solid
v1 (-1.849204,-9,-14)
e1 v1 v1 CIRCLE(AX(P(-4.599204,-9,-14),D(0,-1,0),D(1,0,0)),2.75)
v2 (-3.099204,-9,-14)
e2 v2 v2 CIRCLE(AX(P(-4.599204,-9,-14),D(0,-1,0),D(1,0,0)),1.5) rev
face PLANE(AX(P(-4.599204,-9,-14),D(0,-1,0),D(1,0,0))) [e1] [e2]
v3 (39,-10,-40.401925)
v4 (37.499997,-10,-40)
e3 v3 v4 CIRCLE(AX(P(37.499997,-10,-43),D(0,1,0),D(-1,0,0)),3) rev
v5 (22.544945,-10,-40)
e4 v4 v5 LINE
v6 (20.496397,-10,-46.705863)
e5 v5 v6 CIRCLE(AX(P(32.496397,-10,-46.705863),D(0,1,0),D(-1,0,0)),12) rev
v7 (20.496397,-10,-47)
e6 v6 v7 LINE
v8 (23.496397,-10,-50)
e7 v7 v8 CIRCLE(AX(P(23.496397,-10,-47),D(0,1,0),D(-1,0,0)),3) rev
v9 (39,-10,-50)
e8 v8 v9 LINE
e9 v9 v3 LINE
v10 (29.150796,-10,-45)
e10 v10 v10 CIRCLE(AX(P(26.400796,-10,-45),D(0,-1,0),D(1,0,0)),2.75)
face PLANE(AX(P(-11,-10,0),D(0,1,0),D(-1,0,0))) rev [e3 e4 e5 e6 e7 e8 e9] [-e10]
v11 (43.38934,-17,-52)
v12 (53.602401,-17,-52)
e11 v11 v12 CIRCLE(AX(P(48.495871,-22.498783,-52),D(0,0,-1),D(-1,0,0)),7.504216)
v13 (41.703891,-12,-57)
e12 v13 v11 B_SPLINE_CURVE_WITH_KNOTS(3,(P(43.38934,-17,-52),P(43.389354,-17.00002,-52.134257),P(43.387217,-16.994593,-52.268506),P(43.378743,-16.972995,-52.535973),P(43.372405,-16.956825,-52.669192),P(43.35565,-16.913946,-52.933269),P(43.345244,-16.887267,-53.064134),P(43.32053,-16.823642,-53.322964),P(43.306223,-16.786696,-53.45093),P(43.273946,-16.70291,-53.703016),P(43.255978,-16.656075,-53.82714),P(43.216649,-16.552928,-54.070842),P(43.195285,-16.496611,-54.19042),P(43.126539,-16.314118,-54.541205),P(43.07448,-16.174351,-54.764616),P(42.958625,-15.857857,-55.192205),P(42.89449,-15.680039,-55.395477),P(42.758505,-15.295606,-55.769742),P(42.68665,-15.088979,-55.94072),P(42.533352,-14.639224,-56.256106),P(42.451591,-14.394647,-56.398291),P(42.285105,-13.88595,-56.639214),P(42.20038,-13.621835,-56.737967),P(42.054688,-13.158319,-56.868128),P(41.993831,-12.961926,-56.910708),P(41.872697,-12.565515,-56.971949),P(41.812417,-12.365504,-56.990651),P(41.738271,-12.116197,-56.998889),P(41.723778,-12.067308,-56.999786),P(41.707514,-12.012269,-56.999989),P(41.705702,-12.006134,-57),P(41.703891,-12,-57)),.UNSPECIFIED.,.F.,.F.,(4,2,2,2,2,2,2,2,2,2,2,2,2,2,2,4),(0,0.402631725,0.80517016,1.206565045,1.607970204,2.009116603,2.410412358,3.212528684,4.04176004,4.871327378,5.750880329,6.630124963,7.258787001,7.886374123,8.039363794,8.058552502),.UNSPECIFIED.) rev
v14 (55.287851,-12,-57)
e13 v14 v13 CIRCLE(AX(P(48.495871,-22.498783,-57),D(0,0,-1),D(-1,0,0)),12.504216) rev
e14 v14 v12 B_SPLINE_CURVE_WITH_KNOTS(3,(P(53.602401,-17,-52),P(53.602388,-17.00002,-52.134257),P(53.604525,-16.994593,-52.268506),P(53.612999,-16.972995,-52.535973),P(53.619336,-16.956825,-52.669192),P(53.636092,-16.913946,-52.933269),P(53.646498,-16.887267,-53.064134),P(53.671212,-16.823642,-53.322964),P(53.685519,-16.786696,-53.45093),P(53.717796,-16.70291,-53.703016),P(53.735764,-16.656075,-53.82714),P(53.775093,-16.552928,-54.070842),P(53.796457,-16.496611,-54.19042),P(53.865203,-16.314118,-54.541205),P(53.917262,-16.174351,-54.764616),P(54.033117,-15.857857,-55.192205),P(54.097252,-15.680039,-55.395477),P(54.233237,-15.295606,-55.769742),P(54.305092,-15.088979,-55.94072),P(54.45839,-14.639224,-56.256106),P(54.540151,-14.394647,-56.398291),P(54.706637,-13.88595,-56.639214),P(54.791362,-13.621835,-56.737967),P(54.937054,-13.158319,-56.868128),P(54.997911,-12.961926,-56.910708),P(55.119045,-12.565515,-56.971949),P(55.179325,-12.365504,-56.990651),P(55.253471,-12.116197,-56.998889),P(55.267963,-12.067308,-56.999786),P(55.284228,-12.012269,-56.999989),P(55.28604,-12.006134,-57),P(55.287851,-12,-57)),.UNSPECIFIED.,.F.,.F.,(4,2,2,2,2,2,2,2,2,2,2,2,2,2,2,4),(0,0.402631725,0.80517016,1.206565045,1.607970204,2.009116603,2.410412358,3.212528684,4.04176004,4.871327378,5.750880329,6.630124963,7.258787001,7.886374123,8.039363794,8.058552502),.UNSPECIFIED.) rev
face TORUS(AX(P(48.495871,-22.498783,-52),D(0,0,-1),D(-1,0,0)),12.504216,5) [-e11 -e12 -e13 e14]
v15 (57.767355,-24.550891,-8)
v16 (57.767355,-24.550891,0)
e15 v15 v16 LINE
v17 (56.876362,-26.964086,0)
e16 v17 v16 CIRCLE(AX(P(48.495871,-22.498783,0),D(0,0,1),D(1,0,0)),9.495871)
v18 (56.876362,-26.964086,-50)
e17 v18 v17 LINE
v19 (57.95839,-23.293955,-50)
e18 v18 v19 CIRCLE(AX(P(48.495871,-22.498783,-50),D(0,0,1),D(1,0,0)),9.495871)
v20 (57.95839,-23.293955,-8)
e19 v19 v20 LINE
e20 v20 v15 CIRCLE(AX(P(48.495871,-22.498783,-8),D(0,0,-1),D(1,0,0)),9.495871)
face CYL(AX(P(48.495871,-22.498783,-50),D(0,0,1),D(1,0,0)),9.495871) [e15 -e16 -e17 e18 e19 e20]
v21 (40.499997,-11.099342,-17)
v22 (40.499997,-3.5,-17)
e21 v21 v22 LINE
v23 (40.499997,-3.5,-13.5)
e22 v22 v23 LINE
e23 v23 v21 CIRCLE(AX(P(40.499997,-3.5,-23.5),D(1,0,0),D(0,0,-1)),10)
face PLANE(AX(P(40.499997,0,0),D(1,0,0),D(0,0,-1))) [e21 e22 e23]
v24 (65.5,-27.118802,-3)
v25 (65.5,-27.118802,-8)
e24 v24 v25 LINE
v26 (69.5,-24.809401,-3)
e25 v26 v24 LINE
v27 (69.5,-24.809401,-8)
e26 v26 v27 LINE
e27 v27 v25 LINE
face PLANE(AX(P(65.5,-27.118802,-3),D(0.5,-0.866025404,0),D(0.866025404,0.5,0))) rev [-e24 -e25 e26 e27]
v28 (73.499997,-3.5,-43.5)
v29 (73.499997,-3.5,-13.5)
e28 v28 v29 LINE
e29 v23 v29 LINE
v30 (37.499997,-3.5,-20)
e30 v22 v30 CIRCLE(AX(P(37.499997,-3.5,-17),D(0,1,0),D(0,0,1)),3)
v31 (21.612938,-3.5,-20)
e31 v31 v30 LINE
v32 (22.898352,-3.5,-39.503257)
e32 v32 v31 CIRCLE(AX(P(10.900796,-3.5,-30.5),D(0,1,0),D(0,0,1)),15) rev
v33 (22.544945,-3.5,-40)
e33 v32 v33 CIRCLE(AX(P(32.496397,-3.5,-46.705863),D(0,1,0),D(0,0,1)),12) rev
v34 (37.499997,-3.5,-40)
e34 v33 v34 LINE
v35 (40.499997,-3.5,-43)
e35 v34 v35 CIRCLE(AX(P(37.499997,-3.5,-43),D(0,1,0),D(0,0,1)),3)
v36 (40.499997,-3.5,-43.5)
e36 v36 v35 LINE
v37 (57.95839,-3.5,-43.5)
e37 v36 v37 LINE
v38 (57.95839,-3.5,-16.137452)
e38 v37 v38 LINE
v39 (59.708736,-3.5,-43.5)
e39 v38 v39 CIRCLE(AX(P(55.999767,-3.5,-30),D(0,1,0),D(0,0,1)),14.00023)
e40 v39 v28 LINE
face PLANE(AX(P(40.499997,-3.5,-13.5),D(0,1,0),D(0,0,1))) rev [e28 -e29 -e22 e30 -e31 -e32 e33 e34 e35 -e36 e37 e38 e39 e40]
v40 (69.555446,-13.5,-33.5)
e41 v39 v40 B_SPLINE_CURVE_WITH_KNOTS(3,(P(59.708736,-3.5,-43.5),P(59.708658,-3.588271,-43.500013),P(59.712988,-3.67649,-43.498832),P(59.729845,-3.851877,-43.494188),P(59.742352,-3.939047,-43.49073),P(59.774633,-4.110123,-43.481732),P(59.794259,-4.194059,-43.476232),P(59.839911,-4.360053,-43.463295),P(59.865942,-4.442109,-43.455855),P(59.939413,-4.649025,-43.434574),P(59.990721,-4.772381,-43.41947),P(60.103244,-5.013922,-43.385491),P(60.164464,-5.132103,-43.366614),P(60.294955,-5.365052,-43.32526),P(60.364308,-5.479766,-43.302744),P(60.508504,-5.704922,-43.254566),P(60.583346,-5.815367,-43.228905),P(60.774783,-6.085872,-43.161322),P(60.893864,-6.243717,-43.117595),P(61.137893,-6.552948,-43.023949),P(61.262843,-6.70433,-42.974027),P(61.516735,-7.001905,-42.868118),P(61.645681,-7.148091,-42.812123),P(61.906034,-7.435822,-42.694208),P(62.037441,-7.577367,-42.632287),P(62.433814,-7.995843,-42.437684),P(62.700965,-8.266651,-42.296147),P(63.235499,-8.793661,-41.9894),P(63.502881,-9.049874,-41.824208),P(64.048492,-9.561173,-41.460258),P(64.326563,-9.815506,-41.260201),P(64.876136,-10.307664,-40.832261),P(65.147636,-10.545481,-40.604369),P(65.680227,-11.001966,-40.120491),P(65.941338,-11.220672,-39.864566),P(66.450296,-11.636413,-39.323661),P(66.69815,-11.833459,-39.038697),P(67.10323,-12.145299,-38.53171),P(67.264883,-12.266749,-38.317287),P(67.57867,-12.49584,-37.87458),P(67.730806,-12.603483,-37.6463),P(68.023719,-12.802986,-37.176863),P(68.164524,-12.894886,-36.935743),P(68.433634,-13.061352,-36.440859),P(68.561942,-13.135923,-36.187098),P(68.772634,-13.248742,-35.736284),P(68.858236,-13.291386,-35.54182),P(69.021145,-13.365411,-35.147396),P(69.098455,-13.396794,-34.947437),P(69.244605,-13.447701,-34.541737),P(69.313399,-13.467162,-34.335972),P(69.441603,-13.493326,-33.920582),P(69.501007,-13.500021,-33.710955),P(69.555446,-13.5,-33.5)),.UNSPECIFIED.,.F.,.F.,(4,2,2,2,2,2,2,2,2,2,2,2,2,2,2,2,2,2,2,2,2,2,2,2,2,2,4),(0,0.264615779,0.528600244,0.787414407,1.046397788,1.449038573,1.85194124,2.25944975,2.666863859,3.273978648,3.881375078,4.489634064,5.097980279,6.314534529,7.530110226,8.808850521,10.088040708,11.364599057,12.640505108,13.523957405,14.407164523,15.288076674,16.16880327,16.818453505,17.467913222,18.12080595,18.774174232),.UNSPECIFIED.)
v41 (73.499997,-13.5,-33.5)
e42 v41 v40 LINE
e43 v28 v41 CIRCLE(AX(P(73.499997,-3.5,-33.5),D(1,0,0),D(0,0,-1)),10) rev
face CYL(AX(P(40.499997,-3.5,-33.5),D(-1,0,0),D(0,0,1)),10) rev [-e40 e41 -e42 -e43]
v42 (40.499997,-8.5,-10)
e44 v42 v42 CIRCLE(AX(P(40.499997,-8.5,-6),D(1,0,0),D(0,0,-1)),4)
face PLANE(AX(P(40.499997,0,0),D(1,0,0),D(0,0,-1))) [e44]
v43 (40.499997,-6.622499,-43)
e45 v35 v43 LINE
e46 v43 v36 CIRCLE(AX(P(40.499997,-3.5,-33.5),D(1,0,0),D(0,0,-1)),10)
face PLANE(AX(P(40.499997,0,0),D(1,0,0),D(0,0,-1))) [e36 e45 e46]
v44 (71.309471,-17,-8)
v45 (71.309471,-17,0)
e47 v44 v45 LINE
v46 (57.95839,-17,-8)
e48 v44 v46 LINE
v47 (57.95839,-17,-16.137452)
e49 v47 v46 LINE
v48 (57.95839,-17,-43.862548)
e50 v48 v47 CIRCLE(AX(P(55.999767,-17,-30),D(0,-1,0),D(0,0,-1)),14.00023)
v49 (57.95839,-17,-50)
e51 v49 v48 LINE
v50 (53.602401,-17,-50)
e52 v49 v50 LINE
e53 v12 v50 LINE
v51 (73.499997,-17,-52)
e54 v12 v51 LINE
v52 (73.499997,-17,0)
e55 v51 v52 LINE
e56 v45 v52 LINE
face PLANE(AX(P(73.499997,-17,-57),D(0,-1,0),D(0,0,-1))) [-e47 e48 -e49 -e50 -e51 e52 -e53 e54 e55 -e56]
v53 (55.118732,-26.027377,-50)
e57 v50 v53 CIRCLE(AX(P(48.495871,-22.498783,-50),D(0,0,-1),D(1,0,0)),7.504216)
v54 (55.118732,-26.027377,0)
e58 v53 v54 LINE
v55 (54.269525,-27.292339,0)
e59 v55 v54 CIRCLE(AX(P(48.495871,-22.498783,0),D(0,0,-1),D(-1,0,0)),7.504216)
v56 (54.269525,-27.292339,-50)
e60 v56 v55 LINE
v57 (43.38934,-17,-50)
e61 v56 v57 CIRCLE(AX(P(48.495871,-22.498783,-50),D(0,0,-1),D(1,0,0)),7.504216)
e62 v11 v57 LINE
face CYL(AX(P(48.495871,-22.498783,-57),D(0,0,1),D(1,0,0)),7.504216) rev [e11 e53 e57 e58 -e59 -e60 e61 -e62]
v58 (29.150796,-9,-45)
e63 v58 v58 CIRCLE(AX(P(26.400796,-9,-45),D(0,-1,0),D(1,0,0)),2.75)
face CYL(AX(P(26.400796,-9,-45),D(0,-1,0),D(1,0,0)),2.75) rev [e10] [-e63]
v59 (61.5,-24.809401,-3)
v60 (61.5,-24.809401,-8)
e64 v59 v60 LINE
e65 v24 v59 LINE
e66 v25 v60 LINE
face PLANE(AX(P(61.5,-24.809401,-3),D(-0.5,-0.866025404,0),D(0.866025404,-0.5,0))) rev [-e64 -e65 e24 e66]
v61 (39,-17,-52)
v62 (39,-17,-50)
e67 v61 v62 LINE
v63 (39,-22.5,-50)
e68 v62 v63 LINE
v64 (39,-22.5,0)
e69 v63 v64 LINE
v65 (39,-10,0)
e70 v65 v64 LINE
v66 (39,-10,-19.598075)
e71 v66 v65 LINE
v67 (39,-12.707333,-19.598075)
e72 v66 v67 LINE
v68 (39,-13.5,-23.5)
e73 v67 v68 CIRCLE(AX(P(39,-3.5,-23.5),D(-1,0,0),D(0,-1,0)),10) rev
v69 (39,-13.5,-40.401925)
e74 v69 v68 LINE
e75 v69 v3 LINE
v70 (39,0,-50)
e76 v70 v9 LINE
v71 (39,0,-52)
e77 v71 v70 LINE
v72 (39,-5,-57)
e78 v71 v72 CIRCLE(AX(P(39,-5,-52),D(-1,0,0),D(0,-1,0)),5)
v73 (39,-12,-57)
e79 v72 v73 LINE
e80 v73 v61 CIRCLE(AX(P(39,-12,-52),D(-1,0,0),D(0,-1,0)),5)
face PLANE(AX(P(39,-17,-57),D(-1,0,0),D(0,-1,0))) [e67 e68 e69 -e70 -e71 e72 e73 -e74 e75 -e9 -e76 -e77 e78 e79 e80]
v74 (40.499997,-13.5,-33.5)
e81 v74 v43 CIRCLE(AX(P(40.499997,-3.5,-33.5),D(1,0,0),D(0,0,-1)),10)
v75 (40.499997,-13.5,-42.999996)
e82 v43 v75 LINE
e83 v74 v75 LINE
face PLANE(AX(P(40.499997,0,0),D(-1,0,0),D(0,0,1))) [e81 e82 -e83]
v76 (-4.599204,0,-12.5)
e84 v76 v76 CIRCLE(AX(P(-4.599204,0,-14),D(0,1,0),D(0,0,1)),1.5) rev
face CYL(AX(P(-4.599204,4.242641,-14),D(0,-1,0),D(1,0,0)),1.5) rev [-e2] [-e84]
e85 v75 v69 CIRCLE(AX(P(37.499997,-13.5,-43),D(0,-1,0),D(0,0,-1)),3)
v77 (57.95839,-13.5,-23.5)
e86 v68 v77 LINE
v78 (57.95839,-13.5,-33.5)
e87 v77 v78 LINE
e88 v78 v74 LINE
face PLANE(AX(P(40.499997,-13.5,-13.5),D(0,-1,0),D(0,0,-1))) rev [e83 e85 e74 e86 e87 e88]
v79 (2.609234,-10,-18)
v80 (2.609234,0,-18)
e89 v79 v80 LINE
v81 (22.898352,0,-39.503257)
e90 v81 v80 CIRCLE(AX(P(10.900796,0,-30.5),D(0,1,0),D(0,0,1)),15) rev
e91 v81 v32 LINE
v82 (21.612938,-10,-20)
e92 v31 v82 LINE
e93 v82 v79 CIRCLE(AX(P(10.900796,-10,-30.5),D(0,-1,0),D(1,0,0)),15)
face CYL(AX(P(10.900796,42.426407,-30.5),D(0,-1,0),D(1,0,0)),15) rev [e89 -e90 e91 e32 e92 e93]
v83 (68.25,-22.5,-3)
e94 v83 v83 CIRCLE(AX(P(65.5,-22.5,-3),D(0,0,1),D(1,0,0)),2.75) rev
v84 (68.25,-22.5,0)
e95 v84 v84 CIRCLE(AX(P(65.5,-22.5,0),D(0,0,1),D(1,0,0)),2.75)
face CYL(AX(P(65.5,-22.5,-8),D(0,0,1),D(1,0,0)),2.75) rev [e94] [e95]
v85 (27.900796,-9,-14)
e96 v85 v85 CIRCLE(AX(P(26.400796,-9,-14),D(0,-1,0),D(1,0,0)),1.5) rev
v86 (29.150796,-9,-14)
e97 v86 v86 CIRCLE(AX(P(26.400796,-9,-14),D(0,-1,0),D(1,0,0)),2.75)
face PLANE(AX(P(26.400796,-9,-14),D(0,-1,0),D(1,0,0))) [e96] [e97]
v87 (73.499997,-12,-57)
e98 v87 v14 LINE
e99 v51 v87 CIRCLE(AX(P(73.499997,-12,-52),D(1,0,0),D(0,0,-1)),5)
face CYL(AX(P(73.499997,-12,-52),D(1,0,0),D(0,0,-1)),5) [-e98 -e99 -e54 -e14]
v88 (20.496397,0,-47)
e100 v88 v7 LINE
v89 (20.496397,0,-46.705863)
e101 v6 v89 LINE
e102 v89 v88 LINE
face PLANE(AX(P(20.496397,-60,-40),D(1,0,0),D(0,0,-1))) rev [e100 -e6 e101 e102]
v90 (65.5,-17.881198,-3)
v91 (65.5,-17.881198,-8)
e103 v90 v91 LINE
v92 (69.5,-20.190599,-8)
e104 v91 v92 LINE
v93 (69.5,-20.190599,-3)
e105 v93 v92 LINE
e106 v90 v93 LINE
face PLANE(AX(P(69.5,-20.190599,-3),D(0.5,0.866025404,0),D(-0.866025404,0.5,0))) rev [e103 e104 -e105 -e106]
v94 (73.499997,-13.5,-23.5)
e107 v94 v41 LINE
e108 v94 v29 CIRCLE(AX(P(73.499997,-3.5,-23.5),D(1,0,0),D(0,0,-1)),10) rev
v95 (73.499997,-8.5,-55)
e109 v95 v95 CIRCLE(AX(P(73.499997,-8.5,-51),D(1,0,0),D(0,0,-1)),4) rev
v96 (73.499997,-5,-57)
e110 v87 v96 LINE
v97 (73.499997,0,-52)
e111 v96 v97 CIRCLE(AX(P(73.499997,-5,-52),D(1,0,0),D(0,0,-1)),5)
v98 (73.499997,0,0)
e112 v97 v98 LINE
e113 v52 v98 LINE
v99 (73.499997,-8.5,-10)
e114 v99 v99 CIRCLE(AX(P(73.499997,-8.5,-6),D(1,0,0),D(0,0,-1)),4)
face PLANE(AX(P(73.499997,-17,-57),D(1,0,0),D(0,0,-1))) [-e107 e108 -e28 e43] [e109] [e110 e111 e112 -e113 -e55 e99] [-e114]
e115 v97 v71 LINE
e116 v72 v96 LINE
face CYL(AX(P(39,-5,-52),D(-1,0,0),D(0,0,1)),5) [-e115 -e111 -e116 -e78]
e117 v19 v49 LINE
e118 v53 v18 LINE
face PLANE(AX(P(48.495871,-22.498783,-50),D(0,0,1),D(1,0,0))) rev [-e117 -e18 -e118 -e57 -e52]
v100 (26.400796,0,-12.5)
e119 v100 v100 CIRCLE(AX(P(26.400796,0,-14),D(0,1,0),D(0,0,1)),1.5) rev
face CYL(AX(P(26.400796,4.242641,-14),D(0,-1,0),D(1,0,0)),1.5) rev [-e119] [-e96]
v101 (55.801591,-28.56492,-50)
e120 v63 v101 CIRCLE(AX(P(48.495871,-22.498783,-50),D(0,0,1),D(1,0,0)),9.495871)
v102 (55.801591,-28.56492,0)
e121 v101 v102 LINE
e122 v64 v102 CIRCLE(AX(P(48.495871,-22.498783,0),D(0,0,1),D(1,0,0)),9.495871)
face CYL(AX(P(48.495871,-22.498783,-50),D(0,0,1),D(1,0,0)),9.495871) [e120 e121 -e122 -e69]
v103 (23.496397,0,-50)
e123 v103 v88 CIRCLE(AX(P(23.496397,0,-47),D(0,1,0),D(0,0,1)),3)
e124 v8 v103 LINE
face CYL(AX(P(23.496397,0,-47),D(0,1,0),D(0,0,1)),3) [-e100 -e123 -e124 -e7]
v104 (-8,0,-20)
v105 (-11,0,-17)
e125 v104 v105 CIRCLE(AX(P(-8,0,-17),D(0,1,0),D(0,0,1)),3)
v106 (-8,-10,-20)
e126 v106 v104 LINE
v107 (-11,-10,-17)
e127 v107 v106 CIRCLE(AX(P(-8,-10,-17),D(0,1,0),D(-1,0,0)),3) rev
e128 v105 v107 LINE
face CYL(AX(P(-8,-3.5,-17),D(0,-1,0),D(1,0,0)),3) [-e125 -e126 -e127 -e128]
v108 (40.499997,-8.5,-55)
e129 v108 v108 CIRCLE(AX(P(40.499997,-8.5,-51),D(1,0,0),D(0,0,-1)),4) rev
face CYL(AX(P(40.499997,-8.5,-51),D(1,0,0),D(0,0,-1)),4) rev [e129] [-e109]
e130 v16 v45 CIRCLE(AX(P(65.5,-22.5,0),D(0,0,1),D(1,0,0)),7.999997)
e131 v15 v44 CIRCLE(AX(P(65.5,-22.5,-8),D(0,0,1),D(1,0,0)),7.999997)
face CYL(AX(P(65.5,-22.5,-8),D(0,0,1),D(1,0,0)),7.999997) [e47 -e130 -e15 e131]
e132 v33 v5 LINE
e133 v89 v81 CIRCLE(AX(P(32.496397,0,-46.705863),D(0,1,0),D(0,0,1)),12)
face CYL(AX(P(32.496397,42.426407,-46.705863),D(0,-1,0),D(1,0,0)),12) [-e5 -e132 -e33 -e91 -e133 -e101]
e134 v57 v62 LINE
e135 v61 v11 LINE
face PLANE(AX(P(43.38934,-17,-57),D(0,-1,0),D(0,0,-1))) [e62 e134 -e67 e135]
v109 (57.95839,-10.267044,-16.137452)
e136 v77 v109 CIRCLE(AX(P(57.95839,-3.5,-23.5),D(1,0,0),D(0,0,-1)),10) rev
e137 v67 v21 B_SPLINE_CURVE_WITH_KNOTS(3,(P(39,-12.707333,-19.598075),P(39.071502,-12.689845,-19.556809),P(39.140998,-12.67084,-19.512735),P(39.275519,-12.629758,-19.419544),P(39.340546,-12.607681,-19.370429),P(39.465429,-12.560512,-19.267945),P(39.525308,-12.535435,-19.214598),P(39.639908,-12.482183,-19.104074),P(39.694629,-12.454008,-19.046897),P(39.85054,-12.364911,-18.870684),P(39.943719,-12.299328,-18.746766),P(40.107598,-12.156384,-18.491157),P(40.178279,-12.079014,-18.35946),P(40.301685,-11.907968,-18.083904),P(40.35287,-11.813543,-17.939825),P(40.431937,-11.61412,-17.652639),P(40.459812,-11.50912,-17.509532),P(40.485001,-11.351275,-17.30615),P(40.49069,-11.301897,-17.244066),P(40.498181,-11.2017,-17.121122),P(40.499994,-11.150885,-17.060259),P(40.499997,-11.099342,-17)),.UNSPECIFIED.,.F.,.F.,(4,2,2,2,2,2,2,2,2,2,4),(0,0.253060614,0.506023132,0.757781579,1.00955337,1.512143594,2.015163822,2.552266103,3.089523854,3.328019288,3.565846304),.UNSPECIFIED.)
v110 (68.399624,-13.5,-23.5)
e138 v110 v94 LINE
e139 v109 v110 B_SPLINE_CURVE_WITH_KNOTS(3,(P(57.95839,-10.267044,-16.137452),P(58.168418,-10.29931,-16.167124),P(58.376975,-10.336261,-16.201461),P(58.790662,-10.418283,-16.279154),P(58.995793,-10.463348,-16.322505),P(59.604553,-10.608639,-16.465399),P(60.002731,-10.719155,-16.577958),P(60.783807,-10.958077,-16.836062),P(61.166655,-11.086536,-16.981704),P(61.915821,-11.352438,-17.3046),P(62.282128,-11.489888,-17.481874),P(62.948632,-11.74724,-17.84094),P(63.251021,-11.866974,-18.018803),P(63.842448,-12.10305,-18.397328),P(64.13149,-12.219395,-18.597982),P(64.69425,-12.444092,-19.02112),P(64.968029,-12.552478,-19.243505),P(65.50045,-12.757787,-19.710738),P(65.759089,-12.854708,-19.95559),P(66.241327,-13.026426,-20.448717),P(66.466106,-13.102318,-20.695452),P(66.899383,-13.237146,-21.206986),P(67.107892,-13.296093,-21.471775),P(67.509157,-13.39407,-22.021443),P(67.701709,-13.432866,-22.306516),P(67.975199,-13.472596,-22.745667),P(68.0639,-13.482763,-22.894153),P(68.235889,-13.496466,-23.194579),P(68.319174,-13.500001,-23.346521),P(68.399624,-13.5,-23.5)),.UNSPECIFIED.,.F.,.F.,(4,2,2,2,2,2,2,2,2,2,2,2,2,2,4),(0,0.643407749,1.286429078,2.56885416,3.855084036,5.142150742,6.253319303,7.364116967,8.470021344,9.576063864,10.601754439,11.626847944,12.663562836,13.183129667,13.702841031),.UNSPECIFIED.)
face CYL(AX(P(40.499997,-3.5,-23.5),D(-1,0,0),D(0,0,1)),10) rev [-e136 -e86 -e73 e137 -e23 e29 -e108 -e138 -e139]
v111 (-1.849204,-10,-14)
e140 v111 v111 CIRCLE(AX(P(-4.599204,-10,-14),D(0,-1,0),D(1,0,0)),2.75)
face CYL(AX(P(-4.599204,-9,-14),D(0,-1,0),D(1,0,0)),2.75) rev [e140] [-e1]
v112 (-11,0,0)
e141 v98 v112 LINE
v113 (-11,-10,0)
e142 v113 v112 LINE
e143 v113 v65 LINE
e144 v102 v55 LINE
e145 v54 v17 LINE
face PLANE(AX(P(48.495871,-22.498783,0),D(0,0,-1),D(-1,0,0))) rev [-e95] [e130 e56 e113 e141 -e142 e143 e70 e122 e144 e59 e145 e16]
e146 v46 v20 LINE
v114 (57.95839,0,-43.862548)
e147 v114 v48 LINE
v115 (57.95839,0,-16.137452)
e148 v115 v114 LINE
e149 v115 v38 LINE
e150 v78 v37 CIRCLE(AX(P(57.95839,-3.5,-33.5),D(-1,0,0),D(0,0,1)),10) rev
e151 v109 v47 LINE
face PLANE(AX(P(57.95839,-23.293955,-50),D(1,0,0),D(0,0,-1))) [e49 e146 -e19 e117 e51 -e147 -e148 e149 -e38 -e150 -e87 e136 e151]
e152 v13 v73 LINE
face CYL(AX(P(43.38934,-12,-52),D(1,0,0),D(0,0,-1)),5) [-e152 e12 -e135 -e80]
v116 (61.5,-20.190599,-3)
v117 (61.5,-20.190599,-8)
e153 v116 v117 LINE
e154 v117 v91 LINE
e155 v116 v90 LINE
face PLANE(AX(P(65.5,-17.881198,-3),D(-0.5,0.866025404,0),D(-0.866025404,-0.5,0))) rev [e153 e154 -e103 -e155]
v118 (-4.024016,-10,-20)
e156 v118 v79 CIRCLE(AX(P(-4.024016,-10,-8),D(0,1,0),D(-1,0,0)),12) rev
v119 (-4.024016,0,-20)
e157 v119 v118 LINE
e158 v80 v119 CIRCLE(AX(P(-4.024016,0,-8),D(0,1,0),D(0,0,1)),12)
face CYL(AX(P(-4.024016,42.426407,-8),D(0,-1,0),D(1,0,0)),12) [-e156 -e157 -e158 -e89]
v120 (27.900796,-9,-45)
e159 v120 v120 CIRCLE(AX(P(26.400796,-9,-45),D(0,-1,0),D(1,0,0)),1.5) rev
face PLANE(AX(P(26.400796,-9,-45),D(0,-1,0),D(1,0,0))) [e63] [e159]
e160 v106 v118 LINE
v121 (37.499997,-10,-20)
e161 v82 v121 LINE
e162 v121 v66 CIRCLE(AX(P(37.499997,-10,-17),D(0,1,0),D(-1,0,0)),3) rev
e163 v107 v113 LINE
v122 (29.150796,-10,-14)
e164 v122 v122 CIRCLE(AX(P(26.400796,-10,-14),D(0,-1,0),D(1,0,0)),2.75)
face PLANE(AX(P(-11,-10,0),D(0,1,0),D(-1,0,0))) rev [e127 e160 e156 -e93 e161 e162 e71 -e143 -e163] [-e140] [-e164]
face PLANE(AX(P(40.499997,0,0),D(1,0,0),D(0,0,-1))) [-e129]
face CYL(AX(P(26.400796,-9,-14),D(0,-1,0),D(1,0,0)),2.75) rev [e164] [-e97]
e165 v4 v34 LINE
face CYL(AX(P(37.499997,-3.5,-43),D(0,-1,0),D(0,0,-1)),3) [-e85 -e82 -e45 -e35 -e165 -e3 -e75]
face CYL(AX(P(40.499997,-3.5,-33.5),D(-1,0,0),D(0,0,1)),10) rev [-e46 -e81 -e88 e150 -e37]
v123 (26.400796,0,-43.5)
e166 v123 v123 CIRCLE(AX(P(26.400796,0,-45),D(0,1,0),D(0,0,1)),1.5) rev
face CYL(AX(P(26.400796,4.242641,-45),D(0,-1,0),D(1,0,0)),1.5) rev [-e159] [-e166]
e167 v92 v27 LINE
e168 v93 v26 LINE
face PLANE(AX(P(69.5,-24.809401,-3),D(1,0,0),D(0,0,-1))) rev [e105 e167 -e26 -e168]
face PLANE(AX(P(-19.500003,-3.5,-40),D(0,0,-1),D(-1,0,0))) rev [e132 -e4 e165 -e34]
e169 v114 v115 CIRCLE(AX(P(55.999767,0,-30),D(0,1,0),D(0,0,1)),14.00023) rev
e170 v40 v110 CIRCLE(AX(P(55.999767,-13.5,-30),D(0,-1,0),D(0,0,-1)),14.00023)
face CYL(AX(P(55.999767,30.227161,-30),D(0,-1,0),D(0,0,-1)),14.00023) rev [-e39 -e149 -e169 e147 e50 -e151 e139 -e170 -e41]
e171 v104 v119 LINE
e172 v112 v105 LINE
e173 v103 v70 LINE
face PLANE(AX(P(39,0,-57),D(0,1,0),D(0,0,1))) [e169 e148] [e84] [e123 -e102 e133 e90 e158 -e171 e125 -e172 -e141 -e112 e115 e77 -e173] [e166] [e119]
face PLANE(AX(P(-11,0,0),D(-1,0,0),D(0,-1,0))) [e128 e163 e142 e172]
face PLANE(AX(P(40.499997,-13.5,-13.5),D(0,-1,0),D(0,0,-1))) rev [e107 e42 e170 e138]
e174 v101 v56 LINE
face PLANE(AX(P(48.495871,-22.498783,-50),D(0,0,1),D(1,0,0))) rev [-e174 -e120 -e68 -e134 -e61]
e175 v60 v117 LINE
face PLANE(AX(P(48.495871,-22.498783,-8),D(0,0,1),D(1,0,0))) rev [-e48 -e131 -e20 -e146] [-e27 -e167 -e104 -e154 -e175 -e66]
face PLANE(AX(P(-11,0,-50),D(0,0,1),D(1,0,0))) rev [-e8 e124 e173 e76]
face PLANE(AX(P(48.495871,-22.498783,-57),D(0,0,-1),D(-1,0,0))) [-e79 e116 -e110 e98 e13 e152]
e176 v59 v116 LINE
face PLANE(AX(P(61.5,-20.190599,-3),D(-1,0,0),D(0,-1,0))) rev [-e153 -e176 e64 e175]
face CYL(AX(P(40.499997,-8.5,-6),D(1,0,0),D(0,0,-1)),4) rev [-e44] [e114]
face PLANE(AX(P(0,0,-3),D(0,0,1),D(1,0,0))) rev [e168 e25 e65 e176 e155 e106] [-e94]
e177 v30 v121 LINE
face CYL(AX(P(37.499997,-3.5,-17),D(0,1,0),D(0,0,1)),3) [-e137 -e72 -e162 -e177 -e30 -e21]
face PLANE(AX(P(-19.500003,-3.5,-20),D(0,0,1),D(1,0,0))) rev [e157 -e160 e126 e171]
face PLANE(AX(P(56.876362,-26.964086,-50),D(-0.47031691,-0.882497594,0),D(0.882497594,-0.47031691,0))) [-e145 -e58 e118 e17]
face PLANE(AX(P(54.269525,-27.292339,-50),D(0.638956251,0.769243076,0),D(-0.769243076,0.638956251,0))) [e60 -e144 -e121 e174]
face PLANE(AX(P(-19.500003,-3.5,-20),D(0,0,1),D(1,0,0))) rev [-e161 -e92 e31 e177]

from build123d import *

# Parameters (mm, degrees)
EXTRUDE1_DEPTH  = 57
SKETCH2_R       = 2.75
EXTRUDE2_DEPTH  = 8
EXTRUDE3_DEPTH  = 5
EXTRUDE4_DEPTH  = 50
SKETCH5_R       = 4
EXTRUDE5_DEPTH  = 33
SKETCH6_W       = 30
SKETCH6_H       = 10
EXTRUDE6_DEPTH  = 33
SKETCH7_W       = 50
SKETCH7_H       = 10
EXTRUDE7_DEPTH  = 50
SKETCH10_R      = 1.5
EXTRUDE10_DEPTH = 10
SKETCH11_R      = 2.75
EXTRUDE13_DEPTH = 1
SKETCH12_R      = 15
EXTRUDE14_DEPTH = 10
FILLET2_R       = 5
FILLET3_R       = 5
FILLET4_R       = 10
EXTRUDE15_REACH = 96.553
SKETCH14_W      = 20
SKETCH14_H      = 10
EXTRUDE16_DEPTH = 60
EXTRUDE18_DEPTH = 60
FILLET5_R       = 10
FILLET6_R       = 12
FILLET7_R       = 3
FILLET8_R       = 3
FILLET9_R       = 3


# Some blends are built 0.0001 mm under size
with BuildPart() as part:
    # Sketch1 → Extrude1 (new body)
    with BuildSketch(Plane.XY):
        with BuildLine():
            Line((73.499997202, -17), (73.499997202, 0))
            Line((73.499997202, 0), (39, 0))
            Line((39, 0), (39, -17))
            Line((39, -17), (43.389340395, -17))
            ThreePointArc((43.389340395, -17), (48.49587093, -14.994566191), (53.602401465, -17))
            Line((53.602401465, -17), (73.499997202, -17))
        make_face()
    extrude(amount=-EXTRUDE1_DEPTH)

    # Sketch2 → Extrude2 (add)
    with BuildSketch(Plane.XY):
        with BuildLine():
            Line((57.95839, -23.293955), (57.95839, -17))
            Line((57.95839, -17), (71.309471167, -17))
            ThreePointArc((71.309471167, -17), (69.395977388, -29.48722516), (57.767354943, -24.550891432))
            ThreePointArc((57.767354943, -24.550891432), (57.883931975, -23.925623937), (57.95839, -23.293955))
        make_face()
        with Locations((65.5, -22.5)):
            Circle(SKETCH2_R, mode=Mode.SUBTRACT)
    extrude(amount=-EXTRUDE2_DEPTH)

    # Sketch3 → Extrude3 (cut)
    with BuildSketch(Plane(origin=(0, 0, -8), x_dir=(-1, 0, 0), z_dir=(0, 0, -1))):
        Polygon((-69.5, -20.190598923), (-65.5, -17.881197846), (-61.5, -20.190598923), (-61.5, -24.809401077), (-65.5, -27.118802154), (-69.5, -24.809401077), align=None)
    extrude(amount=-EXTRUDE3_DEPTH, mode=Mode.SUBTRACT)

    # Sketch4 → Extrude4 (add)
    with BuildSketch(Plane.XY):
        with BuildLine():
            Line((39, -17), (39, -22.5))
            ThreePointArc((39, -22.5), (45.271742795, -31.43055539), (55.801591252, -28.564919557))
            Line((55.801591252, -28.564919557), (54.269524764, -27.292339419))
            ThreePointArc((54.269524764, -27.292339419), (43.338902241, -27.950290613), (43.389340395, -17))
            Line((43.389340395, -17), (39, -17))
        make_face()
        with BuildLine():
            Line((56.876362299, -26.964085637), (55.118731957, -26.027376827))
            ThreePointArc((55.118731957, -26.027376827), (55.896414133, -21.25571178), (53.602401465, -17))
            Line((53.602401465, -17), (57.95839, -17))
            Line((57.95839, -17), (57.95839, -23.293955))
            ThreePointArc((57.95839, -23.293955), (57.60414849, -25.184084529), (56.876362299, -26.964085637))
        make_face()
    extrude(amount=-EXTRUDE4_DEPTH)

    # Sketch5 → Extrude5 (cut)
    with BuildSketch(Plane(origin=(73.499997202, 0, 0), x_dir=(0, 0, -1), z_dir=(1, 0, 0))):
        with Locations((6, -8.5)):
            Circle(SKETCH5_R)
        with Locations((51, -8.5)):
            Circle(SKETCH5_R)
    extrude(amount=-EXTRUDE5_DEPTH, mode=Mode.SUBTRACT)

    # Sketch6 → Extrude6 (cut)
    with BuildSketch(Plane(origin=(73.499997202, 0, 0), x_dir=(0, 0, -1), z_dir=(1, 0, 0))):
        with Locations((28.5, -8.5)):
            Rectangle(SKETCH6_W, SKETCH6_H)
    extrude(amount=-EXTRUDE6_DEPTH, mode=Mode.SUBTRACT)

    # Sketch7 → Extrude7 (add)
    with BuildSketch(Plane.ZY.offset(-39)):
        with Locations((-25, -5)):
            Rectangle(SKETCH7_W, SKETCH7_H)
    extrude(amount=EXTRUDE7_DEPTH)

    # Sketch10 → Extrude10 (cut)
    with BuildSketch(Plane.XZ.offset(10)):
        with Locations((-4.599204374, -45)):
            Circle(SKETCH10_R)
        with Locations((26.400795626, -45)):
            Circle(SKETCH10_R)
        with Locations((26.400795626, -14)):
            Circle(SKETCH10_R)
        with Locations((-4.599204374, -14)):
            Circle(SKETCH10_R)
    extrude(amount=-EXTRUDE10_DEPTH, mode=Mode.SUBTRACT)

    # Sketch11 → Extrude13 (cut)
    with BuildSketch(Plane.XZ.offset(10)):
        with Locations((-4.599204374, -14)):
            Circle(SKETCH11_R)
        with Locations((26.400795626, -14)):
            Circle(SKETCH11_R)
        with Locations((26.400795626, -45)):
            Circle(SKETCH11_R)
    extrude(amount=-EXTRUDE13_DEPTH, mode=Mode.SUBTRACT)

    # Sketch12 → Extrude14 (cut)
    with BuildSketch(Plane.XZ.offset(10)):
        with Locations((10.900795626, -30.5)):
            Circle(SKETCH12_R)
    extrude(amount=-EXTRUDE14_DEPTH, mode=Mode.SUBTRACT)

    # Fillet2
    fillet2_edges = [part.edges().sort_by_distance(p)[0] for p in [
        (48.49587093, -14.994566191, -57),
        (63.551199334, -17, -57),
        (41.194670197, -17, -57),
    ]]
    fillet(fillet2_edges, radius=FILLET2_R)

    # Fillet3
    fillet3_edges = [part.edges().sort_by_distance(p)[0] for p in [
        (56.249998601, 0, -57),
    ]]
    fillet(fillet3_edges, radius=FILLET3_R)

    # Fillet4
    fillet4_edges = [part.edges().sort_by_distance(p)[0] for p in [
        (56.999997202, -13.5, -43.5),
    ]]
    fillet(fillet4_edges, radius=FILLET4_R - 0.0001)  # a hair under: the kernel refuses the full size

    # Extrude15: up to this face of the body (flat: up to its plane)
    extrude15_end = Plane(part.part.faces().sort_by_distance((35.938109504, 0, -24.375937497))[0])
    # Sketch13 → Extrude15 (cut, up to the picked face)
    with BuildSketch(Plane.XZ.offset(17), mode=Mode.PRIVATE) as extrude15_sk1:
        with BuildLine():
            Line((57.95839, -16.137451745), (57.95839, -43.862548255))
            ThreePointArc((57.95839, -43.862548255), (69.999997202, -30), (57.95839, -16.137451745))
        make_face()
    extrude15_tool1 = split(extrude(extrude15_sk1.sketch, amount=-EXTRUDE15_REACH, mode=Mode.PRIVATE), bisect_by=extrude15_end, keep=Keep.BOTH, mode=Mode.PRIVATE)
    add(extrude15_tool1.solids().sort_by(Axis((63.013259, -17, -30), (0, 1, 0)))[0], mode=Mode.SUBTRACT)

    # Sketch14 → Extrude16 (cut)
    with BuildSketch(Plane(origin=(40.499997202, 0, 0), x_dir=(0, 0, -1), z_dir=(1, 0, 0))):
        with Locations((30, -8.5)):
            Rectangle(SKETCH14_W, SKETCH14_H)
    extrude(amount=-EXTRUDE16_DEPTH, mode=Mode.SUBTRACT)

    # Sketch15 → Extrude18 (cut)
    with BuildSketch(Plane(origin=(0, 0, 0), x_dir=(1, 0, 0), z_dir=(0, 1, 0))):
        Polygon((2.11392048, 20), (-12.43887347, 20), (-12.43887347, 50), (20.496397049, 50), (20.496397049, 40), (2.11392048, 40), align=None)
    extrude(amount=-EXTRUDE18_DEPTH, mode=Mode.SUBTRACT)

    # Fillet5
    # the kernel refuses this fillet: 10 mm, written as the material it adds along each edge
    with BuildSketch(Plane(origin=(73.499997202, -13.5, -13.5), x_dir=(0, 1, 0), z_dir=(-1, 0, 0))) as fillet5_piece_1_section:
        with BuildLine():
            CenterArc((FILLET5_R, FILLET5_R), FILLET5_R, 180, 90)
            Line((0, FILLET5_R), (0, 0))
            Line((0, 0), (FILLET5_R, 0))
        make_face()
    fillet5_piece_1 = extrude(amount=33, mode=Mode.PRIVATE)
    fillet5_piece_1 = split(fillet5_piece_1, bisect_by=Plane(origin=(57.95839, -11.020059701, -15.351239597), z_dir=(1, 0, 0)), keep=Keep.TOP, mode=Mode.PRIVATE)
    fillet5_piece_1 = fillet5_piece_1 - Plane(origin=(55.999766898, -11.020059701, -30), x_dir=(0.13989934874108464, 0, -0.9901657296744927), z_dir=(0, -1, 0)) * Cylinder(14.000230304, 106, mode=Mode.PRIVATE)
    add(fillet5_piece_1)
    with BuildSketch(Plane(origin=(73.499997202, -13.5, -13.5), x_dir=(0, 1, 0), z_dir=(-1, 0, 0))) as fillet5_piece_2_section:
        with BuildLine():
            CenterArc((FILLET5_R, FILLET5_R), FILLET5_R, 180, 90)
            Line((0, FILLET5_R), (0, 0))
            Line((0, 0), (FILLET5_R, 0))
        make_face()
    fillet5_piece_2 = extrude(amount=33, mode=Mode.PRIVATE)
    fillet5_piece_2 = split(fillet5_piece_2, bisect_by=Plane(origin=(57.95839, -10.883667804, -15.13209824), z_dir=(-1, 0, 0)), keep=Keep.TOP, mode=Mode.PRIVATE)
    fillet5_piece_2 = fillet5_piece_2 - Plane(origin=(55.999766898, -10.883667804, -30), x_dir=(0.13989934874108464, 0, -0.9901657296744927), z_dir=(0, -1, 0)) * Cylinder(14.000230304, 106, mode=Mode.PRIVATE)
    add(fillet5_piece_2)
    with BuildSketch(Plane(origin=(73.499997202, -13.5, -13.5), x_dir=(0, 1, 0), z_dir=(-1, 0, 0))) as fillet5_piece_3_section:
        with BuildLine():
            CenterArc((FILLET5_R, FILLET5_R), FILLET5_R, 180, 90)
            Line((0, FILLET5_R), (0, 0))
            Line((0, 0), (FILLET5_R, 0))
        make_face()
    fillet5_piece_3 = extrude(amount=33, mode=Mode.PRIVATE)
    fillet5_piece_3 = split(fillet5_piece_3, bisect_by=Plane(origin=(57.95839, -12.859707332, -18.675298705), z_dir=(-1, 0, 0)), keep=Keep.TOP, mode=Mode.PRIVATE)
    fillet5_piece_3 = fillet5_piece_3 & Plane(origin=(55.999766898, -12.859707332, -30), x_dir=(0.13989934874108464, 0, -0.9901657296744927), z_dir=(0, -1, 0)) * Cylinder(14.000230304, 106, mode=Mode.PRIVATE)
    add(fillet5_piece_3)
    with BuildSketch(Plane(origin=(73.499997202, -13.5, -13.5), x_dir=(0, 1, 0), z_dir=(-1, 0, 0))) as fillet5_piece_4_section:
        with BuildLine():
            CenterArc((FILLET5_R, FILLET5_R), FILLET5_R, 180, 90)
            Line((0, FILLET5_R), (0, 0))
            Line((0, 0), (FILLET5_R, 0))
        make_face()
    fillet5_piece_4 = extrude(amount=58, mode=Mode.PRIVATE)
    fillet5_piece_4 = split(fillet5_piece_4, bisect_by=Plane(origin=(40.499997202, -11.236048857, -15.763951143), z_dir=(-1, 0, 0)), keep=Keep.TOP, mode=Mode.PRIVATE)
    fillet5_piece_4 = split(fillet5_piece_4, bisect_by=Plane(origin=(39, -11.236048857, -15.763951143), z_dir=(1, 0, 0)), keep=Keep.TOP, mode=Mode.PRIVATE)
    add(fillet5_piece_4)

    # Fillet6
    fillet6_edges = [part.edges().sort_by_distance(p)[0] for p in [
        (0.188652983, -5, -20),
        (20.496397049, -5, -42.029285899),
    ]]
    fillet(fillet6_edges, radius=FILLET6_R)

    # Fillet7
    # the kernel refuses this fillet: 3 mm, written as the material it takes off along each edge
    with BuildSketch(Plane(origin=(40.499997202, -18.59939602, -40), x_dir=(-1, 0, 0), z_dir=(0, 1, 0))) as fillet7_piece_1_section:
        with BuildLine():
            CenterArc((FILLET7_R, -FILLET7_R), FILLET7_R, 90, 90)
            Line((0, -FILLET7_R), (0, 0))
            Line((0, 0), (FILLET7_R, 0))
        make_face()
    fillet7_piece_1 = extrude(amount=15.09939602, mode=Mode.PRIVATE)
    fillet7_piece_1 = split(fillet7_piece_1, bisect_by=Plane(origin=(39.991722384, -13.5, -40.797398057), z_dir=(0, 1, 0)), keep=Keep.TOP, mode=Mode.PRIVATE)
    add(fillet7_piece_1, mode=Mode.SUBTRACT)
    with BuildSketch(Plane(origin=(40.499997202, -3.5, -20), x_dir=(-1, 0, 0), z_dir=(0, -1, 0))) as fillet7_piece_2_section:
        with BuildLine():
            CenterArc((FILLET7_R, -FILLET7_R), FILLET7_R, 90, 90)
            Line((0, -FILLET7_R), (0, 0))
            Line((0, 0), (FILLET7_R, 0))
        make_face()
    fillet7_piece_2 = extrude(amount=16.867496998, mode=Mode.PRIVATE)
    fillet7_piece_2 = fillet7_piece_2 & Plane(origin=(38.630208494, -3.5, -23.5), x_dir=(0, 1, 0), z_dir=(1, 0, 0)) * Cylinder(10, 46, mode=Mode.PRIVATE)
    add(fillet7_piece_2, mode=Mode.SUBTRACT)

    # Fillet8
    fillet8_edges = [part.edges().sort_by_distance(p)[0] for p in [
        (-11, -5, -20),
    ]]
    fillet(fillet8_edges, radius=FILLET8_R)

    # Fillet9
    fillet9_edges = [part.edges().sort_by_distance(p)[0] for p in [
        (20.496397049, -5, -50),
    ]]
    fillet(fillet9_edges, radius=FILLET9_R)


solid = part.part
